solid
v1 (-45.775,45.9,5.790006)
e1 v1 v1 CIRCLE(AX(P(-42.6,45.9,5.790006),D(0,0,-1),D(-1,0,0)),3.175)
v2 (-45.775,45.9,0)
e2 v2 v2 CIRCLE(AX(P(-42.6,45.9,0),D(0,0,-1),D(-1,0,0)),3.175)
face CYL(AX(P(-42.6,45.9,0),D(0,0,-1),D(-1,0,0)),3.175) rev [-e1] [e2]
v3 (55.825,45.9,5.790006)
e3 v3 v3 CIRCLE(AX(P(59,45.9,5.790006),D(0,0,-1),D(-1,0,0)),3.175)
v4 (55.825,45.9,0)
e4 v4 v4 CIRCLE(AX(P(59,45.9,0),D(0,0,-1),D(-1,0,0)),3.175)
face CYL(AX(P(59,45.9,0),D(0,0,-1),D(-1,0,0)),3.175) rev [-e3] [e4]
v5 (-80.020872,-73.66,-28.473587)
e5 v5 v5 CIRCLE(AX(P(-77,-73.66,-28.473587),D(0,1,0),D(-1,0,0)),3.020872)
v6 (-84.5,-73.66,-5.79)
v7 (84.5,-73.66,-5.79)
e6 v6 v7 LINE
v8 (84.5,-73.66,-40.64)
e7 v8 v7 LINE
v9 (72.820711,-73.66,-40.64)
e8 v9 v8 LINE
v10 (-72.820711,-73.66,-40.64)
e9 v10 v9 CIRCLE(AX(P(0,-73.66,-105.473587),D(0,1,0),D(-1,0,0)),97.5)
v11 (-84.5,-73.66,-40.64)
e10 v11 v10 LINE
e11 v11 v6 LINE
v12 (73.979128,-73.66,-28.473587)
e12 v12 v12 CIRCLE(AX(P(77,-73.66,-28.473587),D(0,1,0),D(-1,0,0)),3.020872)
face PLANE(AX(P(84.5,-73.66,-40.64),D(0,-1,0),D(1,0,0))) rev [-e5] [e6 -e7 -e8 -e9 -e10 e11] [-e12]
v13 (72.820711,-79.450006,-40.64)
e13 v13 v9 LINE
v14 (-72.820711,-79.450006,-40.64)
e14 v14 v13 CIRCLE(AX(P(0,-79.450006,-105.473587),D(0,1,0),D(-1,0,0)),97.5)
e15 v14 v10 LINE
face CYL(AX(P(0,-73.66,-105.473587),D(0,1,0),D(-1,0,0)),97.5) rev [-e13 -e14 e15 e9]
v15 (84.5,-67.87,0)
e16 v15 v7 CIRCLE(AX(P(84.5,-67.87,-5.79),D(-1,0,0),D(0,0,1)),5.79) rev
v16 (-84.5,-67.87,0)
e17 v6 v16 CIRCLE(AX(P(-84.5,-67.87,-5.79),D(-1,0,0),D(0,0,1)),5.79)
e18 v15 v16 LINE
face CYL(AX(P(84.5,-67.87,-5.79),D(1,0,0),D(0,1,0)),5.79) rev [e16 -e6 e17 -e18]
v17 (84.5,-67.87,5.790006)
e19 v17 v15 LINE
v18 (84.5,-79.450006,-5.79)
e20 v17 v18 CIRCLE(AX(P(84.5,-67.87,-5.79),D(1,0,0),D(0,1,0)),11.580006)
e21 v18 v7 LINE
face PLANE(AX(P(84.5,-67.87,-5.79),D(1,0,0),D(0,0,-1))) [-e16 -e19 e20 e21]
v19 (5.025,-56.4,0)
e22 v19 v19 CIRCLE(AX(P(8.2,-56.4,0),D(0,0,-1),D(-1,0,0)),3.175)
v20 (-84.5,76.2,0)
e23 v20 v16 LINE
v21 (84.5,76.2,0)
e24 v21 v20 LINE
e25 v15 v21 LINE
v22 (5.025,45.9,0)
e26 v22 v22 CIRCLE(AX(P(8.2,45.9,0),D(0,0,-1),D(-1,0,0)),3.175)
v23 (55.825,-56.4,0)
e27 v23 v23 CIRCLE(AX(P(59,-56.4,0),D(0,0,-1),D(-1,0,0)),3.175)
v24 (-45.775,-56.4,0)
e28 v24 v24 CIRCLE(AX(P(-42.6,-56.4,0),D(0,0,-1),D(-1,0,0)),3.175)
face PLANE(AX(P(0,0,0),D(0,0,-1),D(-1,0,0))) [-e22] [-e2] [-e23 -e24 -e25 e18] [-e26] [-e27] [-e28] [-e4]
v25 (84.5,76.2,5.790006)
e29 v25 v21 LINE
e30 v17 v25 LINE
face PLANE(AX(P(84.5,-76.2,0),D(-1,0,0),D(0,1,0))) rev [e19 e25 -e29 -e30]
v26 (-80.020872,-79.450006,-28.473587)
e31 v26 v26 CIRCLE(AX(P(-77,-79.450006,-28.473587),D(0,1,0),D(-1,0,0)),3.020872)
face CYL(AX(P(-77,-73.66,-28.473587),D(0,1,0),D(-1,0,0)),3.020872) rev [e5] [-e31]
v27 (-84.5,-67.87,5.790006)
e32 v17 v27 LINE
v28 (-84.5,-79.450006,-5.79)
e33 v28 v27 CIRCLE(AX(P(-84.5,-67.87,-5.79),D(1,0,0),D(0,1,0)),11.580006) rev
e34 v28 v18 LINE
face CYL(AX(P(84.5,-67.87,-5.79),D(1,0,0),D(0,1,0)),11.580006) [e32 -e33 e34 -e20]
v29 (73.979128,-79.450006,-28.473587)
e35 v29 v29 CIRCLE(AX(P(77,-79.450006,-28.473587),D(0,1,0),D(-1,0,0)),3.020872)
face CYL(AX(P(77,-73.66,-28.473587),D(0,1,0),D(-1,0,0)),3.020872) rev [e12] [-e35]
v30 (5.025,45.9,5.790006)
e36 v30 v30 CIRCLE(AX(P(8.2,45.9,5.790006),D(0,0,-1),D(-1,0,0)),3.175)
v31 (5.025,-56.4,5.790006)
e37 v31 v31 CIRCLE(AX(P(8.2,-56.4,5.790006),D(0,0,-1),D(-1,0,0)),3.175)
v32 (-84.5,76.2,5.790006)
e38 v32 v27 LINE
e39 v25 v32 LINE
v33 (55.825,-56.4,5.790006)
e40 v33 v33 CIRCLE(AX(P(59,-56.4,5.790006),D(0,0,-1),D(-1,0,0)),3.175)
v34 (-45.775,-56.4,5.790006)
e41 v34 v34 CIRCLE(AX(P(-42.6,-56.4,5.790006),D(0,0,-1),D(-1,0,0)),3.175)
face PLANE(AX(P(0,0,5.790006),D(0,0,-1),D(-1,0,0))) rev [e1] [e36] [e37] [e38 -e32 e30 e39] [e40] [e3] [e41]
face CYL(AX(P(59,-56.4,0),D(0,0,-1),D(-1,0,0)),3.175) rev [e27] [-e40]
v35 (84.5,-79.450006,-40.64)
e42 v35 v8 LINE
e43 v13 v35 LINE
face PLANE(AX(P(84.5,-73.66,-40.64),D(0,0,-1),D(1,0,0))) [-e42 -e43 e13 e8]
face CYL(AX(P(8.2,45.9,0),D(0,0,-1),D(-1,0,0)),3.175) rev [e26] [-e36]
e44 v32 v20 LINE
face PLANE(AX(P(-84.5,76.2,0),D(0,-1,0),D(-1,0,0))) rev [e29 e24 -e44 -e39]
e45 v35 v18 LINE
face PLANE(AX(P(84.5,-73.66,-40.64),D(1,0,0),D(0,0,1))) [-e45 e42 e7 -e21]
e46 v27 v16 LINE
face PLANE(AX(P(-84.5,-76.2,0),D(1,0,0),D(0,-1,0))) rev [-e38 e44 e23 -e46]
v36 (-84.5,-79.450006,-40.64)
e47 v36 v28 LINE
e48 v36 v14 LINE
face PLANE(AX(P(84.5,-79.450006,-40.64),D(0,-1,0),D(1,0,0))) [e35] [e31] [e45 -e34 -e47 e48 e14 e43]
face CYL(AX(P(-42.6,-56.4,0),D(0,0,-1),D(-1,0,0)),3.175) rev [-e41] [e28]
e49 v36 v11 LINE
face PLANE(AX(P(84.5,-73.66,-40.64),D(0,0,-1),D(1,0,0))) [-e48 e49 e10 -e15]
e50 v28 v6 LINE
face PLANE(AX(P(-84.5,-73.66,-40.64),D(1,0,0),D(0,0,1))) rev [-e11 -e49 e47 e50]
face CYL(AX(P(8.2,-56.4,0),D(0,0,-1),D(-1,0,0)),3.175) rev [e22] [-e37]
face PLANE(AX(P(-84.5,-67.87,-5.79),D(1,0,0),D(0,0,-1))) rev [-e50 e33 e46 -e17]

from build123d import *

# Parameters (mm, degrees)
SKETCH1_W                  = 169
SKETCH1_H                  = 152.4
BOSS_EXTRUDE1_DEPTH        = 2.54
SKETCH2_W                  = 169
SKETCH2_H                  = 2.54
BOSS_EXTRUDE2_DEPTH        = 40.64
CUT_EXTRUDE1_REACH         = 122.823
SKETCH4_R                  = 3.175
CUT_EXTRUDE2_REACH         = 178.776
SKETCH3_R                  = 3.020871564
SKETCH3_R_2                = 97.5
CONVERT_SOLID1_START       = -5.790000104
CONVERT_SOLID1_OUTLINE_W   = 169
CONVERT_SOLID1_OUTLINE_H   = 149.86
CONVERT_SOLID1_OUTLINE_R   = 3.175
CONVERT_SOLID1_DEPTH       = 11.580006304
CONVERT_SOLID1_START_2     = -40.64
CONVERT_SOLID1_2_OUTLINE_W = 169
CONVERT_SOLID1_2_OUTLINE_H = 3.2500062
CONVERT_SOLID1_2_DEPTH     = 43.18
CONVERT_SOLID1_START_3     = 2.54
CONVERT_SOLID1_3_OUTLINE_W = 169
CONVERT_SOLID1_3_OUTLINE_H = 2.54
CONVERT_SOLID1_3_DEPTH     = 2.060276352
CONVERT_SOLID1_START_4     = -67.869999896
CONVERT_SOLID1_4_OUTLINE_W = 169
CONVERT_SOLID1_4_OUTLINE_H = 5.790000104
CONVERT_SOLID1_4_DEPTH     = 144.069999896
CONVERT_SOLID1_START_5     = -79.4500062
CONVERT_SOLID1_5_OUTLINE_R = 3.020871564
CONVERT_SOLID1_5_DEPTH     = 3.2500062
CONVERT_SOLID1_6_OUTLINE_W = 169
CONVERT_SOLID1_6_OUTLINE_H = 2.54
CONVERT_SOLID1_6_DEPTH     = 0.546460785
CONVERT_SOLID1_START_6     = -85
CONVERT_SOLID1_7_DEPTH     = 170


with BuildPart() as part:
    # Sketch1 → Boss-Extrude1 (new body)
    with BuildSketch(Plane.XY):
        Rectangle(SKETCH1_W, SKETCH1_H)
    extrude(amount=BOSS_EXTRUDE1_DEPTH)

    # Sketch2 → Boss-Extrude2 (add)
    with BuildSketch(Plane(origin=(0, 0, 0), x_dir=(-1, 0, 0), z_dir=(0, 0, -1))):
        with Locations((0, -74.93)):
            Rectangle(SKETCH2_W, SKETCH2_H)
    extrude(amount=BOSS_EXTRUDE2_DEPTH)

    # Sketch4 → Cut-Extrude1 (cut, up to next)
    with BuildSketch(Plane(origin=(0, 0, 0), x_dir=(-1, 0, 0), z_dir=(0, 0, -1)), mode=Mode.PRIVATE) as cut_extrude1_sk1:
        with Locations((-59, 45.9)):
            Circle(SKETCH4_R)
    cut_extrude1_tool1 = extrude(cut_extrude1_sk1.sketch, amount=-CUT_EXTRUDE1_REACH, mode=Mode.PRIVATE) & part.part
    # Sketch4 → Cut-Extrude1 (cut, up to next)
    with BuildSketch(Plane(origin=(0, 0, 0), x_dir=(-1, 0, 0), z_dir=(0, 0, -1)), mode=Mode.PRIVATE) as cut_extrude1_sk2:
        with Locations((-59, -56.4)):
            Circle(SKETCH4_R)
    cut_extrude1_tool2 = extrude(cut_extrude1_sk2.sketch, amount=-CUT_EXTRUDE1_REACH, mode=Mode.PRIVATE) & part.part
    # Sketch4 → Cut-Extrude1 (cut, up to next)
    with BuildSketch(Plane(origin=(0, 0, 0), x_dir=(-1, 0, 0), z_dir=(0, 0, -1)), mode=Mode.PRIVATE) as cut_extrude1_sk3:
        with Locations((-8.2, 45.9)):
            Circle(SKETCH4_R)
    cut_extrude1_tool3 = extrude(cut_extrude1_sk3.sketch, amount=-CUT_EXTRUDE1_REACH, mode=Mode.PRIVATE) & part.part
    # Sketch4 → Cut-Extrude1 (cut, up to next)
    with BuildSketch(Plane(origin=(0, 0, 0), x_dir=(-1, 0, 0), z_dir=(0, 0, -1)), mode=Mode.PRIVATE) as cut_extrude1_sk4:
        with Locations((42.6, 45.9)):
            Circle(SKETCH4_R)
    cut_extrude1_tool4 = extrude(cut_extrude1_sk4.sketch, amount=-CUT_EXTRUDE1_REACH, mode=Mode.PRIVATE) & part.part
    # Sketch4 → Cut-Extrude1 (cut, up to next)
    with BuildSketch(Plane(origin=(0, 0, 0), x_dir=(-1, 0, 0), z_dir=(0, 0, -1)), mode=Mode.PRIVATE) as cut_extrude1_sk5:
        with Locations((42.6, -56.4)):
            Circle(SKETCH4_R)
    cut_extrude1_tool5 = extrude(cut_extrude1_sk5.sketch, amount=-CUT_EXTRUDE1_REACH, mode=Mode.PRIVATE) & part.part
    # Sketch4 → Cut-Extrude1 (cut, up to next)
    with BuildSketch(Plane(origin=(0, 0, 0), x_dir=(-1, 0, 0), z_dir=(0, 0, -1)), mode=Mode.PRIVATE) as cut_extrude1_sk6:
        with Locations((-8.2, -56.4)):
            Circle(SKETCH4_R)
    cut_extrude1_tool6 = extrude(cut_extrude1_sk6.sketch, amount=-CUT_EXTRUDE1_REACH, mode=Mode.PRIVATE) & part.part
    add(cut_extrude1_tool1.solids().sort_by_distance((59, 45.9, 0))[0], mode=Mode.SUBTRACT)
    add(cut_extrude1_tool2.solids().sort_by_distance((59, -56.4, 0))[0], mode=Mode.SUBTRACT)
    add(cut_extrude1_tool3.solids().sort_by_distance((8.2, 45.9, 0))[0], mode=Mode.SUBTRACT)
    add(cut_extrude1_tool4.solids().sort_by_distance((-42.6, 45.9, 0))[0], mode=Mode.SUBTRACT)
    add(cut_extrude1_tool5.solids().sort_by_distance((-42.6, -56.4, 0))[0], mode=Mode.SUBTRACT)
    add(cut_extrude1_tool6.solids().sort_by_distance((8.2, -56.4, 0))[0], mode=Mode.SUBTRACT)

    # Sketch3 → Cut-Extrude2 (cut, up to next)
    with BuildSketch(Plane(origin=(0, -73.66, 0), x_dir=(1, 0, 0), z_dir=(0, 1, 0)), mode=Mode.PRIVATE) as cut_extrude2_sk1:
        with Locations(Location((77, 28.473587136, 0), (0, 0, 180))):
            Circle(SKETCH3_R)
    cut_extrude2_tool1 = extrude(cut_extrude2_sk1.sketch, amount=-CUT_EXTRUDE2_REACH, mode=Mode.PRIVATE) & part.part
    # Sketch3 → Cut-Extrude2 (cut, up to next)
    with BuildSketch(Plane(origin=(0, -73.66, 0), x_dir=(1, 0, 0), z_dir=(0, 1, 0)), mode=Mode.PRIVATE) as cut_extrude2_sk2:
        with Locations(Location((-77, 28.473587136, 0), (0, 0, 180))):
            Circle(SKETCH3_R)
    cut_extrude2_tool2 = extrude(cut_extrude2_sk2.sketch, amount=-CUT_EXTRUDE2_REACH, mode=Mode.PRIVATE) & part.part
    # Sketch3 → Cut-Extrude2 (cut, up to next)
    with BuildSketch(Plane(origin=(0, -73.66, 0), x_dir=(1, 0, 0), z_dir=(0, 1, 0)), mode=Mode.PRIVATE) as cut_extrude2_sk3:
        with Locations((0, 105.473587136)):
            Circle(SKETCH3_R_2)
    cut_extrude2_tool3 = extrude(cut_extrude2_sk3.sketch, amount=-CUT_EXTRUDE2_REACH, mode=Mode.PRIVATE) & part.part
    add(cut_extrude2_tool1.solids().sort_by_distance((77, -73.66, -28.473587))[0], mode=Mode.SUBTRACT)
    add(cut_extrude2_tool2.solids().sort_by_distance((-77, -73.66, -28.473587))[0], mode=Mode.SUBTRACT)
    add(cut_extrude2_tool3.solids().sort_by_distance((0, -73.66, -105.473587))[0], mode=Mode.SUBTRACT)

    # Convert-Solid1: read off the stored shape, not the designer's step
    # Convert-Solid1 outline → Convert-Solid1 (add)
    with BuildSketch(Plane.XY.offset(CONVERT_SOLID1_START)):
        with Locations((0, 1.27)):
            Rectangle(CONVERT_SOLID1_OUTLINE_W, CONVERT_SOLID1_OUTLINE_H)
        with Locations((-42.6, -56.4)):
            Circle(CONVERT_SOLID1_OUTLINE_R, mode=Mode.SUBTRACT)
        with Locations((8.2, -56.4)):
            Circle(CONVERT_SOLID1_OUTLINE_R, mode=Mode.SUBTRACT)
        with Locations((59, -56.4)):
            Circle(CONVERT_SOLID1_OUTLINE_R, mode=Mode.SUBTRACT)
        with Locations((-42.6, 45.9)):
            Circle(CONVERT_SOLID1_OUTLINE_R, mode=Mode.SUBTRACT)
        with Locations((8.2, 45.9)):
            Circle(CONVERT_SOLID1_OUTLINE_R, mode=Mode.SUBTRACT)
        with Locations((59, 45.9)):
            Circle(CONVERT_SOLID1_OUTLINE_R, mode=Mode.SUBTRACT)
    extrude(amount=CONVERT_SOLID1_DEPTH)

    # Convert-Solid1 2 outline → Convert-Solid1 2 (add)
    with BuildSketch(Plane.XY.offset(CONVERT_SOLID1_START_2)):
        with Locations((0, -77.8250031)):
            Rectangle(CONVERT_SOLID1_2_OUTLINE_W, CONVERT_SOLID1_2_OUTLINE_H)
    extrude(amount=CONVERT_SOLID1_2_DEPTH)

    # Convert-Solid1 3 outline → Convert-Solid1 3 (add)
    with BuildSketch(Plane.XY.offset(CONVERT_SOLID1_START_3)):
        with Locations((0, -74.93)):
            Rectangle(CONVERT_SOLID1_3_OUTLINE_W, CONVERT_SOLID1_3_OUTLINE_H)
    extrude(amount=CONVERT_SOLID1_3_DEPTH)

    # Convert-Solid1 4 outline → Convert-Solid1 4 (cut)
    with BuildSketch(Plane(origin=(0, 0, 0), x_dir=(1, 0, 0), z_dir=(0, 1, 0)).offset(CONVERT_SOLID1_START_4)):
        with Locations((0, 2.895000052)):
            Rectangle(CONVERT_SOLID1_4_OUTLINE_W, CONVERT_SOLID1_4_OUTLINE_H)
    extrude(amount=CONVERT_SOLID1_4_DEPTH, mode=Mode.SUBTRACT)

    # Convert-Solid1 5 outline → Convert-Solid1 5 (cut)
    with BuildSketch(Plane(origin=(0, 0, 0), x_dir=(1, 0, 0), z_dir=(0, 1, 0)).offset(CONVERT_SOLID1_START_5)):
        with BuildLine():
            Line((72.820711196, 40.64), (-72.820711196, 40.64))
            ThreePointArc((-72.820711196, 40.64), (0, 7.973587136), (72.820711196, 40.64))
        make_face()
        with Locations((-77, 28.473587136)):
            Circle(CONVERT_SOLID1_5_OUTLINE_R)
        with Locations((77, 28.473587136)):
            Circle(CONVERT_SOLID1_5_OUTLINE_R)
    extrude(amount=CONVERT_SOLID1_5_DEPTH, mode=Mode.SUBTRACT)

    # Convert-Solid1 6 outline → Convert-Solid1 6 (cut)
    with BuildSketch(Plane(origin=(0, 0, 0), x_dir=(1, 0, 0), z_dir=(0, 1, 0)).offset(CONVERT_SOLID1_START_5)):
        with Locations((0, -1.27)):
            Rectangle(CONVERT_SOLID1_6_OUTLINE_W, CONVERT_SOLID1_6_OUTLINE_H)
    extrude(amount=CONVERT_SOLID1_6_DEPTH, mode=Mode.SUBTRACT)

    # Convert-Solid1 7 outline → Convert-Solid1 7 (cut)
    with BuildSketch(Plane.YZ.offset(CONVERT_SOLID1_START_6)):
        with BuildLine():
            Line((-67.869999896, -5.790000104), (-67.869999896, 0))
            ThreePointArc((-67.869999896, 0), (-71.964148233, -1.695851767), (-73.66, -5.790000104))
            Line((-73.66, -5.790000104), (-67.869999896, -5.790000104))
        make_face()
        with BuildLine():
            ThreePointArc((-79.4500062, -5.790000104), (-76.05830088, 2.39830088), (-67.869999896, 5.7900062))
            Line((-67.869999896, 5.7900062), (-73.66, 5.7900062))
            Line((-73.66, 5.7900062), (-73.66, 4.600276352))
            Line((-73.66, 4.600276352), (-76.2, 4.600276352))
            Line((-76.2, 4.600276352), (-76.2, 2.54))
            Line((-76.2, 2.54), (-78.903545415, 2.54))
            Line((-78.903545415, 2.54), (-78.903545415, 0))
            Line((-78.903545415, 0), (-79.4500062, 0))
            Line((-79.4500062, 0), (-79.4500062, -5.790000104))
        make_face()
    extrude(amount=CONVERT_SOLID1_7_DEPTH, mode=Mode.SUBTRACT)


solid = part.part
